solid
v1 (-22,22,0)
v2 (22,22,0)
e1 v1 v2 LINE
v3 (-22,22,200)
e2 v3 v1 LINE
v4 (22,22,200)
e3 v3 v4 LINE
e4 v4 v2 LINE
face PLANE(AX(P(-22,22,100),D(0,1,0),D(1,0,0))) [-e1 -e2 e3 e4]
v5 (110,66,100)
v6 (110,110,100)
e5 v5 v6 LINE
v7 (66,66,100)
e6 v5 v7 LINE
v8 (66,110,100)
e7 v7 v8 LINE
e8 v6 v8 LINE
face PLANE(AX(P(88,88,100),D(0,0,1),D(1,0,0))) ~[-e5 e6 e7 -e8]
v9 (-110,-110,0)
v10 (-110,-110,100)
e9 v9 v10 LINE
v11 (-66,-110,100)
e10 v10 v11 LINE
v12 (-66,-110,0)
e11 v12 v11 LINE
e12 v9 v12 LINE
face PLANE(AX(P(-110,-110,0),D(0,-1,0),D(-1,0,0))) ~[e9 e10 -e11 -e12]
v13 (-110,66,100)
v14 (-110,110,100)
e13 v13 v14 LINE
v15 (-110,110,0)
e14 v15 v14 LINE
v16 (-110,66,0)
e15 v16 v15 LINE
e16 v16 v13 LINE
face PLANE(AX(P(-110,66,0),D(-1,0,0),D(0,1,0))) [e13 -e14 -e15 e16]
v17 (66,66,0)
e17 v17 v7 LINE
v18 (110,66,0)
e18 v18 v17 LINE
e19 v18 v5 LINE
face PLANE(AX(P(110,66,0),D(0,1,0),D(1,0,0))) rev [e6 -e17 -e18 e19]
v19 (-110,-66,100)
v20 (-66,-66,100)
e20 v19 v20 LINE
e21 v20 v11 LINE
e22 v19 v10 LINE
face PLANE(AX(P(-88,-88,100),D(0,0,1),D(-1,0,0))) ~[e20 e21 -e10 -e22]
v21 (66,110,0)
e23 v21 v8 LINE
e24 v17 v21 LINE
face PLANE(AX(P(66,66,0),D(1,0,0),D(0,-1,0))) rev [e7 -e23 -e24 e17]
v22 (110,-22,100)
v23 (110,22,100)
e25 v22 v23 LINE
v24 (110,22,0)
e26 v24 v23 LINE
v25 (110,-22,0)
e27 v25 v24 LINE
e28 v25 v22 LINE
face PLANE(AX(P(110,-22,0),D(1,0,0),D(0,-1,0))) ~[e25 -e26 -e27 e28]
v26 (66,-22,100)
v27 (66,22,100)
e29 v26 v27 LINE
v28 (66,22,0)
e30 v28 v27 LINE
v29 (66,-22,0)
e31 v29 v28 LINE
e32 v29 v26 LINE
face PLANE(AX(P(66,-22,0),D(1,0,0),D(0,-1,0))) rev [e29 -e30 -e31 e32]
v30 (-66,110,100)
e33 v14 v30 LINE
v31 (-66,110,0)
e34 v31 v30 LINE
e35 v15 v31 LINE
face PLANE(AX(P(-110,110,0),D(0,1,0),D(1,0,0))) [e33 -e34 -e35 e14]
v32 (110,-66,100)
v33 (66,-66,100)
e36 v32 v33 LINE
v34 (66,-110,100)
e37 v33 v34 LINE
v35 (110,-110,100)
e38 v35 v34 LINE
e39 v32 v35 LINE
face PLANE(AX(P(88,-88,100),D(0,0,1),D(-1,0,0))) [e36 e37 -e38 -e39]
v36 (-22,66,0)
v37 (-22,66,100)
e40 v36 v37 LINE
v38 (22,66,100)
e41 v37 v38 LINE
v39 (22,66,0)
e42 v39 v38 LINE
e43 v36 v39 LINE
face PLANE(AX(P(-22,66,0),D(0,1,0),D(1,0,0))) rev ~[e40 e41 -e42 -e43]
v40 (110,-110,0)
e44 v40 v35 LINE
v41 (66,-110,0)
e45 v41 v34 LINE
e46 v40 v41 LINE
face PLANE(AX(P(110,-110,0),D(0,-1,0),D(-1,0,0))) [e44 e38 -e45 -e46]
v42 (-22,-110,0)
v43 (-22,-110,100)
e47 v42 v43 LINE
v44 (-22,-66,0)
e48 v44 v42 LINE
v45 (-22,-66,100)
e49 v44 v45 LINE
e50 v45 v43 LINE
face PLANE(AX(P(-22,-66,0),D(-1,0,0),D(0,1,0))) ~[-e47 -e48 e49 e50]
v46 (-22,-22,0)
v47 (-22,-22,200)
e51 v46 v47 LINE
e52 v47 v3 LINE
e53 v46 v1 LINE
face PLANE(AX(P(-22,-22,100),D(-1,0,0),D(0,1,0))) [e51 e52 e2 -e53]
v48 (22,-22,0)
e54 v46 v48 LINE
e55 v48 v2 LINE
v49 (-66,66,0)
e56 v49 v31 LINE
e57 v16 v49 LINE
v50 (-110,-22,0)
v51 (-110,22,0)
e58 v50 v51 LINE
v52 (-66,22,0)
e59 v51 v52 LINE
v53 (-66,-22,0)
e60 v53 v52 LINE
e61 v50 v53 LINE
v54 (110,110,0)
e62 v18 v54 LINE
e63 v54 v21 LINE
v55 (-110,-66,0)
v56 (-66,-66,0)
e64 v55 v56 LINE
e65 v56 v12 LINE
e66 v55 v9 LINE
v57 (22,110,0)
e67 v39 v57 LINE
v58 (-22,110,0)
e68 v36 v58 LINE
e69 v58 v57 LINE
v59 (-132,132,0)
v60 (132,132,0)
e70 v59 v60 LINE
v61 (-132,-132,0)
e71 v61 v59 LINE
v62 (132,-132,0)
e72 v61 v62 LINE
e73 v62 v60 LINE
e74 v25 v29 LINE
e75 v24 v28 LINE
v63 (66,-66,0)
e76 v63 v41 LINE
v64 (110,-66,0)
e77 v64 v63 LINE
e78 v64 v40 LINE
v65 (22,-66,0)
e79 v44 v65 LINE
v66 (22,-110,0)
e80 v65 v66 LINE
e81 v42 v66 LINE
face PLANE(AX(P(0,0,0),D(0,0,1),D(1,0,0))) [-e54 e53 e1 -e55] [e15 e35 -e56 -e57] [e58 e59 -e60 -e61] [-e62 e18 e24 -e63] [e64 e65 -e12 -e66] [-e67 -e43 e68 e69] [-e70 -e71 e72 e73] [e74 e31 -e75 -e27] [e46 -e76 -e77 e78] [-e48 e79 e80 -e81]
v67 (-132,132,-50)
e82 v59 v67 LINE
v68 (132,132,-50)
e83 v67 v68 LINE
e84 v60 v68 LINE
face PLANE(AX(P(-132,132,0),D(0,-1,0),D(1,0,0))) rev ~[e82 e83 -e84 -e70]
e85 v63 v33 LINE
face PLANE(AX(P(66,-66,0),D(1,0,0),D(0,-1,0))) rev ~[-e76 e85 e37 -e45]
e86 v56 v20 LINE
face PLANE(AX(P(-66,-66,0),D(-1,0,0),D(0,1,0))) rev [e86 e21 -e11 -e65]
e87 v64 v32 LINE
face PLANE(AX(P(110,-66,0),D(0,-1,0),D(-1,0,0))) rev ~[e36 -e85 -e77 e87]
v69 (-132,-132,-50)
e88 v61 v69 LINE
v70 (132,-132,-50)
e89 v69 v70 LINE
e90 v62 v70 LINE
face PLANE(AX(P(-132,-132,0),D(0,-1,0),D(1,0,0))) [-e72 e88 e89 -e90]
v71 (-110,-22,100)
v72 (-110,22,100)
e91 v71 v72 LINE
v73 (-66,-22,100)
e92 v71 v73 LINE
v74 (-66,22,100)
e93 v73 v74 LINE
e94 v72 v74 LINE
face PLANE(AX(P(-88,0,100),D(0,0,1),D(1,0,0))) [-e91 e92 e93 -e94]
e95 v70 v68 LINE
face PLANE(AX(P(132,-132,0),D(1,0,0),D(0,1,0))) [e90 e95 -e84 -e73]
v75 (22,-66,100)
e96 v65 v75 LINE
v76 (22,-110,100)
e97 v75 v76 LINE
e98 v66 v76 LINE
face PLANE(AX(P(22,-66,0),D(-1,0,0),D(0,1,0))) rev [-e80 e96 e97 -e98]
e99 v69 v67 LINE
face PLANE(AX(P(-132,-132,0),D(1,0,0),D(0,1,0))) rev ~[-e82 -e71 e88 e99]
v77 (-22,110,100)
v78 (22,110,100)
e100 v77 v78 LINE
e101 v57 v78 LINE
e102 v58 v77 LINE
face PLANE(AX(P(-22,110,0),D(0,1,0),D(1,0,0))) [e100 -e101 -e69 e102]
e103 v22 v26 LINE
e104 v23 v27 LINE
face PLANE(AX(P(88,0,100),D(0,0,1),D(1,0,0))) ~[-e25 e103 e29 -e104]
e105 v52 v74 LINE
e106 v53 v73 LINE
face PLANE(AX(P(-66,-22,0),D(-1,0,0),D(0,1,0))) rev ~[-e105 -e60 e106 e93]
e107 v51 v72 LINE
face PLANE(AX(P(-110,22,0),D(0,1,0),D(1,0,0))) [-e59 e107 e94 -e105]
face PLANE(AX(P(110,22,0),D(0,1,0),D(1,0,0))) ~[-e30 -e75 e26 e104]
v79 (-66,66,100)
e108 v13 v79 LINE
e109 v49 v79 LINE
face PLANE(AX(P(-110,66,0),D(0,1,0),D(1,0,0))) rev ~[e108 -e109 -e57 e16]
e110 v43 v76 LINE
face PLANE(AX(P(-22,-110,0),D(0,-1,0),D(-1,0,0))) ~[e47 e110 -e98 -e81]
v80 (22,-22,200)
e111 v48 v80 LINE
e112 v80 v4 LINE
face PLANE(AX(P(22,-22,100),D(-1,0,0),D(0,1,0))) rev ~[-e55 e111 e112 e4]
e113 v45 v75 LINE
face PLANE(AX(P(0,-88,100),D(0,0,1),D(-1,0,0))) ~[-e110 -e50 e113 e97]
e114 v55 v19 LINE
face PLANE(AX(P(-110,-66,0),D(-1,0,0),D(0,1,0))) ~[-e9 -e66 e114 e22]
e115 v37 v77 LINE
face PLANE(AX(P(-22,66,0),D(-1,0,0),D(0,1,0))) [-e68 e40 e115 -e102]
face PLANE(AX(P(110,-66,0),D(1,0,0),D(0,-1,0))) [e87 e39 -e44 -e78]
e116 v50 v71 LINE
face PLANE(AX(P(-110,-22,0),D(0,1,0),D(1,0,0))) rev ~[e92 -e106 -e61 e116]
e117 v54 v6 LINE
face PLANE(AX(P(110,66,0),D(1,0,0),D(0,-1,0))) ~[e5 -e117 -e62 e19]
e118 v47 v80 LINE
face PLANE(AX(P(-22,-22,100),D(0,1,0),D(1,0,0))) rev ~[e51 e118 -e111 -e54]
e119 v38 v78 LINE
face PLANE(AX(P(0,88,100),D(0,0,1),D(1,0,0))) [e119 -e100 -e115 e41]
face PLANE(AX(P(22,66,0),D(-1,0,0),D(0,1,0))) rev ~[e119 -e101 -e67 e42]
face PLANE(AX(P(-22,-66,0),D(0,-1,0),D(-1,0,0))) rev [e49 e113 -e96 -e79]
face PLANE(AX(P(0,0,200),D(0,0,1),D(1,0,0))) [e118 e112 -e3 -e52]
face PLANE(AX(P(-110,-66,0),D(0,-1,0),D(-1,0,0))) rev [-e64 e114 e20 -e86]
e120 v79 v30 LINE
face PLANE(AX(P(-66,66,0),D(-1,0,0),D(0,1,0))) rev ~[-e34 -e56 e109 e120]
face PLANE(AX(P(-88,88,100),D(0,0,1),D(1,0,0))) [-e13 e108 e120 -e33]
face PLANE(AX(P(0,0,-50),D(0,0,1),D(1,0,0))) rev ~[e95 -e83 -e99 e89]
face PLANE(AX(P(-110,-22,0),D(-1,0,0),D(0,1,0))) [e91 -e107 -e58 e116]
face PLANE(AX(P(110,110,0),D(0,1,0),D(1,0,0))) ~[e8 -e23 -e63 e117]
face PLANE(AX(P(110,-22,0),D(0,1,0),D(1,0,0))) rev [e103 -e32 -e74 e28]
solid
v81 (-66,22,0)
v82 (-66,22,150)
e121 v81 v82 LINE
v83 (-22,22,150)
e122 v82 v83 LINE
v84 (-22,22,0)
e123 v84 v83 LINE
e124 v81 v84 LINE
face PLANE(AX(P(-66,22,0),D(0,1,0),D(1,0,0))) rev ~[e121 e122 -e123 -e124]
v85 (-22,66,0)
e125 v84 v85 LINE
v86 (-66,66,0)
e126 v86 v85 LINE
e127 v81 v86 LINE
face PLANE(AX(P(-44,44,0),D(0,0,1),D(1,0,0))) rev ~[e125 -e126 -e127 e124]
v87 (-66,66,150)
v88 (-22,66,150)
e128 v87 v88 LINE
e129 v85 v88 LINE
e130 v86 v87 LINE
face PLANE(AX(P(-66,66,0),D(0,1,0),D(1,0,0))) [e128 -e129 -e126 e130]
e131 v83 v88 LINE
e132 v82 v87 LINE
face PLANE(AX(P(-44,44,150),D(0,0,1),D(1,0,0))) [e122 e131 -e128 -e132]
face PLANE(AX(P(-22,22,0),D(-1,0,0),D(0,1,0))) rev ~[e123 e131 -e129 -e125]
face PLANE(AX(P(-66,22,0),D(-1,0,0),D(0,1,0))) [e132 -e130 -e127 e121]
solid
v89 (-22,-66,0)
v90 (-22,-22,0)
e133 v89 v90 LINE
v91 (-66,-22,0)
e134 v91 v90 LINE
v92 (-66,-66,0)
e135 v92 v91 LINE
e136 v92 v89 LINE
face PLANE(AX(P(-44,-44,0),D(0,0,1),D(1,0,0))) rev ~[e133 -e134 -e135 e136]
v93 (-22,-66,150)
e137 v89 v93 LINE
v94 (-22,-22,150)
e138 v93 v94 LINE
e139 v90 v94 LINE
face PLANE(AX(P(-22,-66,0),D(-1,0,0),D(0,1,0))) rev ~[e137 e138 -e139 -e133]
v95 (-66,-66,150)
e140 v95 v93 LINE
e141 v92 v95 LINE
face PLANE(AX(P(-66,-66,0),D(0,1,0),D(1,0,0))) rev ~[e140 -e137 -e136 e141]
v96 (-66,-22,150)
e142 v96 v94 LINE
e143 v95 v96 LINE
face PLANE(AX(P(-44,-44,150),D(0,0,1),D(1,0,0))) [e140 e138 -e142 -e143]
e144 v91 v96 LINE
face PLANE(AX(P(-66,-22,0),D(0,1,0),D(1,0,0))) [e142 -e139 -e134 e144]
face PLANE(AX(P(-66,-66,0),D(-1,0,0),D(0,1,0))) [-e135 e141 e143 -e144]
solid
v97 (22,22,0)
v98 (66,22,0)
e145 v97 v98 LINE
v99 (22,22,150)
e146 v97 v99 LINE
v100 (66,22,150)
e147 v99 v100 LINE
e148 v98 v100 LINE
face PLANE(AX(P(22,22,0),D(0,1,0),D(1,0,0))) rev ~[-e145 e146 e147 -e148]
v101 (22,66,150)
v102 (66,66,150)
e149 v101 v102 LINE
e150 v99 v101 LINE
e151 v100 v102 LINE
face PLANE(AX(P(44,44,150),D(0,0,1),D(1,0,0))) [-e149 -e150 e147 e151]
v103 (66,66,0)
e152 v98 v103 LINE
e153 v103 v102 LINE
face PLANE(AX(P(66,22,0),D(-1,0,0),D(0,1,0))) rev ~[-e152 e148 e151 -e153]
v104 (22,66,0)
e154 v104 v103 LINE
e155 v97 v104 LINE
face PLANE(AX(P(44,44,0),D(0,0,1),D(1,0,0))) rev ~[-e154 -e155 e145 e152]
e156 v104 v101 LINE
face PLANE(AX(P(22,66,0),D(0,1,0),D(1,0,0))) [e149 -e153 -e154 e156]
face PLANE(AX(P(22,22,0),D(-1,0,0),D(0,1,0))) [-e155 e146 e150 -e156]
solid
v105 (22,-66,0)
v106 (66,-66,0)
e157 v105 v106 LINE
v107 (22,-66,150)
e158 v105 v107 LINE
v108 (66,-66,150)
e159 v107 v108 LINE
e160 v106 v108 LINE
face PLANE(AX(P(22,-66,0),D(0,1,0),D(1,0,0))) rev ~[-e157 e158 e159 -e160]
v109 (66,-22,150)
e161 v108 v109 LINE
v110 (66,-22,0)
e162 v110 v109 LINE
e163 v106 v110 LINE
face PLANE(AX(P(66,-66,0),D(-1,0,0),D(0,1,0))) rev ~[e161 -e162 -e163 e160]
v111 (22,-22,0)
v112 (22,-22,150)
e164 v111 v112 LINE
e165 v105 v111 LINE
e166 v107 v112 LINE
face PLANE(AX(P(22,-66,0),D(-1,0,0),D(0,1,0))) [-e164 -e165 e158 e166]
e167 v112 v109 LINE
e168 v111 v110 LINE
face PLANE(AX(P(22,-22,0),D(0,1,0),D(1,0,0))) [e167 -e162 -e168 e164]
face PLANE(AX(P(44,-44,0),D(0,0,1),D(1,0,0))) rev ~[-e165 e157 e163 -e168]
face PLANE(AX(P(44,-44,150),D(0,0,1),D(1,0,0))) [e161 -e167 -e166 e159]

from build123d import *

# Parameters (mm, degrees)
F0_W     = 44
F0_H     = 44
F1_DEPTH = 100
F0_W_2   = 264
F0_H_2   = 264
F4_DEPTH = 50
F5_W     = 44
F5_H     = 44
F6_DEPTH = 150
F7_DEPTH = 100


# Not quite as in the source:
# - a feature names something its author has since deleted; it is built from what else it names


with BuildPart() as f1:
    # F0 (on Top) → F1 (new body)
    with BuildSketch(Plane.XY):
        with Locations((-88, 0)):
            Rectangle(F0_W, F0_H)
    extrude(amount=F1_DEPTH)


with BuildPart() as f1b:
    # F0 (on Top) → F1, piece 2 (new body)
    with BuildSketch(Plane.XY):
        with Locations((-88, 88)):
            Rectangle(F0_W, F0_H)
    extrude(amount=F1_DEPTH)


with BuildPart() as f1c:
    # F0 (on Top) → F1, piece 3 (new body)
    with BuildSketch(Plane.XY):
        with Locations((0, 88)):
            Rectangle(F0_W, F0_H)
    extrude(amount=F1_DEPTH)


with BuildPart() as f1d:
    # F0 (on Top) → F1, piece 4 (new body)
    with BuildSketch(Plane.XY):
        Rectangle(F0_W, F0_H)
    extrude(amount=F1_DEPTH)


with BuildPart() as f2_1:
    # F2: instance of F1
    add(f1.part.mirror(Plane.YZ))


with BuildPart() as f2_2:
    # F2: instance of F1b
    add(f1b.part.mirror(Plane.YZ))


with BuildPart() as f3_1:
    # F3: instance of F1b
    add(f1b.part.mirror(Plane.XZ))


with BuildPart() as f3_2:
    # F3: instance of F1c
    add(f1c.part.mirror(Plane.XZ))


with BuildPart() as f3_3:
    # F3: instance of F2_2
    add(f2_2.part.mirror(Plane.XZ))


with BuildPart() as f1_1:
    add(f1.part)

    add(f1b.part)  # F4 merges F1b

    add(f1c.part)  # F4 merges F1c

    add(f1d.part)  # F4 merges F1d

    add(f2_1.part)  # F4 merges F2_1

    add(f2_2.part)  # F4 merges F2_2

    add(f3_1.part)  # F4 merges F3_1

    add(f3_2.part)  # F4 merges F3_2

    add(f3_3.part)  # F4 merges F3_3
    # F0 (on Top) → F4 (join)
    with BuildSketch(Plane.XY):
        Rectangle(F0_W_2, F0_H_2)
        with Locations((-88, 0)):
            Rectangle(F0_W, F0_H, mode=Mode.SUBTRACT)
        with Locations((-88, 88)):
            Rectangle(F0_W, F0_H, mode=Mode.SUBTRACT)
        Rectangle(F0_W, F0_H, mode=Mode.SUBTRACT)
        with Locations((0, 88)):
            Rectangle(F0_W, F0_H, mode=Mode.SUBTRACT)
        with Locations((-88, 0)):
            Rectangle(F0_W, F0_H)
        Rectangle(F0_W, F0_H)
        with Locations((-88, 88)):
            Rectangle(F0_W, F0_H)
        with Locations((0, 88)):
            Rectangle(F0_W, F0_H)
    extrude(amount=-F4_DEPTH)

    # F7 (add): a face of the model
    f7_faces = [f1_1.faces().sort_by_distance(p)[0] for p in [
        (0, 0, 100),
    ]]
    extrude(f7_faces, amount=F7_DEPTH)


with BuildPart() as f6:
    # F5 (on face) → F6 (new body)
    with BuildSketch(Plane.XY):
        with Locations((-44, 44)):
            Rectangle(F5_W, F5_H)
    extrude(amount=F6_DEPTH)


with BuildPart() as f6b:
    # F5 (on face) → F6, piece 2 (new body)
    with BuildSketch(Plane.XY):
        with Locations((44, 44)):
            Rectangle(F5_W, F5_H)
    extrude(amount=F6_DEPTH)


with BuildPart() as f6c:
    # F5 (on face) → F6, piece 3 (new body)
    with BuildSketch(Plane.XY):
        with Locations((44, -44)):
            Rectangle(F5_W, F5_H)
    extrude(amount=F6_DEPTH)


with BuildPart() as f6d:
    # F5 (on face) → F6, piece 4 (new body)
    with BuildSketch(Plane.XY):
        with Locations((-44, -44)):
            Rectangle(F5_W, F5_H)
    extrude(amount=F6_DEPTH)


solid = Compound([f1_1.part, f6.part, f6b.part, f6c.part, f6d.part])
